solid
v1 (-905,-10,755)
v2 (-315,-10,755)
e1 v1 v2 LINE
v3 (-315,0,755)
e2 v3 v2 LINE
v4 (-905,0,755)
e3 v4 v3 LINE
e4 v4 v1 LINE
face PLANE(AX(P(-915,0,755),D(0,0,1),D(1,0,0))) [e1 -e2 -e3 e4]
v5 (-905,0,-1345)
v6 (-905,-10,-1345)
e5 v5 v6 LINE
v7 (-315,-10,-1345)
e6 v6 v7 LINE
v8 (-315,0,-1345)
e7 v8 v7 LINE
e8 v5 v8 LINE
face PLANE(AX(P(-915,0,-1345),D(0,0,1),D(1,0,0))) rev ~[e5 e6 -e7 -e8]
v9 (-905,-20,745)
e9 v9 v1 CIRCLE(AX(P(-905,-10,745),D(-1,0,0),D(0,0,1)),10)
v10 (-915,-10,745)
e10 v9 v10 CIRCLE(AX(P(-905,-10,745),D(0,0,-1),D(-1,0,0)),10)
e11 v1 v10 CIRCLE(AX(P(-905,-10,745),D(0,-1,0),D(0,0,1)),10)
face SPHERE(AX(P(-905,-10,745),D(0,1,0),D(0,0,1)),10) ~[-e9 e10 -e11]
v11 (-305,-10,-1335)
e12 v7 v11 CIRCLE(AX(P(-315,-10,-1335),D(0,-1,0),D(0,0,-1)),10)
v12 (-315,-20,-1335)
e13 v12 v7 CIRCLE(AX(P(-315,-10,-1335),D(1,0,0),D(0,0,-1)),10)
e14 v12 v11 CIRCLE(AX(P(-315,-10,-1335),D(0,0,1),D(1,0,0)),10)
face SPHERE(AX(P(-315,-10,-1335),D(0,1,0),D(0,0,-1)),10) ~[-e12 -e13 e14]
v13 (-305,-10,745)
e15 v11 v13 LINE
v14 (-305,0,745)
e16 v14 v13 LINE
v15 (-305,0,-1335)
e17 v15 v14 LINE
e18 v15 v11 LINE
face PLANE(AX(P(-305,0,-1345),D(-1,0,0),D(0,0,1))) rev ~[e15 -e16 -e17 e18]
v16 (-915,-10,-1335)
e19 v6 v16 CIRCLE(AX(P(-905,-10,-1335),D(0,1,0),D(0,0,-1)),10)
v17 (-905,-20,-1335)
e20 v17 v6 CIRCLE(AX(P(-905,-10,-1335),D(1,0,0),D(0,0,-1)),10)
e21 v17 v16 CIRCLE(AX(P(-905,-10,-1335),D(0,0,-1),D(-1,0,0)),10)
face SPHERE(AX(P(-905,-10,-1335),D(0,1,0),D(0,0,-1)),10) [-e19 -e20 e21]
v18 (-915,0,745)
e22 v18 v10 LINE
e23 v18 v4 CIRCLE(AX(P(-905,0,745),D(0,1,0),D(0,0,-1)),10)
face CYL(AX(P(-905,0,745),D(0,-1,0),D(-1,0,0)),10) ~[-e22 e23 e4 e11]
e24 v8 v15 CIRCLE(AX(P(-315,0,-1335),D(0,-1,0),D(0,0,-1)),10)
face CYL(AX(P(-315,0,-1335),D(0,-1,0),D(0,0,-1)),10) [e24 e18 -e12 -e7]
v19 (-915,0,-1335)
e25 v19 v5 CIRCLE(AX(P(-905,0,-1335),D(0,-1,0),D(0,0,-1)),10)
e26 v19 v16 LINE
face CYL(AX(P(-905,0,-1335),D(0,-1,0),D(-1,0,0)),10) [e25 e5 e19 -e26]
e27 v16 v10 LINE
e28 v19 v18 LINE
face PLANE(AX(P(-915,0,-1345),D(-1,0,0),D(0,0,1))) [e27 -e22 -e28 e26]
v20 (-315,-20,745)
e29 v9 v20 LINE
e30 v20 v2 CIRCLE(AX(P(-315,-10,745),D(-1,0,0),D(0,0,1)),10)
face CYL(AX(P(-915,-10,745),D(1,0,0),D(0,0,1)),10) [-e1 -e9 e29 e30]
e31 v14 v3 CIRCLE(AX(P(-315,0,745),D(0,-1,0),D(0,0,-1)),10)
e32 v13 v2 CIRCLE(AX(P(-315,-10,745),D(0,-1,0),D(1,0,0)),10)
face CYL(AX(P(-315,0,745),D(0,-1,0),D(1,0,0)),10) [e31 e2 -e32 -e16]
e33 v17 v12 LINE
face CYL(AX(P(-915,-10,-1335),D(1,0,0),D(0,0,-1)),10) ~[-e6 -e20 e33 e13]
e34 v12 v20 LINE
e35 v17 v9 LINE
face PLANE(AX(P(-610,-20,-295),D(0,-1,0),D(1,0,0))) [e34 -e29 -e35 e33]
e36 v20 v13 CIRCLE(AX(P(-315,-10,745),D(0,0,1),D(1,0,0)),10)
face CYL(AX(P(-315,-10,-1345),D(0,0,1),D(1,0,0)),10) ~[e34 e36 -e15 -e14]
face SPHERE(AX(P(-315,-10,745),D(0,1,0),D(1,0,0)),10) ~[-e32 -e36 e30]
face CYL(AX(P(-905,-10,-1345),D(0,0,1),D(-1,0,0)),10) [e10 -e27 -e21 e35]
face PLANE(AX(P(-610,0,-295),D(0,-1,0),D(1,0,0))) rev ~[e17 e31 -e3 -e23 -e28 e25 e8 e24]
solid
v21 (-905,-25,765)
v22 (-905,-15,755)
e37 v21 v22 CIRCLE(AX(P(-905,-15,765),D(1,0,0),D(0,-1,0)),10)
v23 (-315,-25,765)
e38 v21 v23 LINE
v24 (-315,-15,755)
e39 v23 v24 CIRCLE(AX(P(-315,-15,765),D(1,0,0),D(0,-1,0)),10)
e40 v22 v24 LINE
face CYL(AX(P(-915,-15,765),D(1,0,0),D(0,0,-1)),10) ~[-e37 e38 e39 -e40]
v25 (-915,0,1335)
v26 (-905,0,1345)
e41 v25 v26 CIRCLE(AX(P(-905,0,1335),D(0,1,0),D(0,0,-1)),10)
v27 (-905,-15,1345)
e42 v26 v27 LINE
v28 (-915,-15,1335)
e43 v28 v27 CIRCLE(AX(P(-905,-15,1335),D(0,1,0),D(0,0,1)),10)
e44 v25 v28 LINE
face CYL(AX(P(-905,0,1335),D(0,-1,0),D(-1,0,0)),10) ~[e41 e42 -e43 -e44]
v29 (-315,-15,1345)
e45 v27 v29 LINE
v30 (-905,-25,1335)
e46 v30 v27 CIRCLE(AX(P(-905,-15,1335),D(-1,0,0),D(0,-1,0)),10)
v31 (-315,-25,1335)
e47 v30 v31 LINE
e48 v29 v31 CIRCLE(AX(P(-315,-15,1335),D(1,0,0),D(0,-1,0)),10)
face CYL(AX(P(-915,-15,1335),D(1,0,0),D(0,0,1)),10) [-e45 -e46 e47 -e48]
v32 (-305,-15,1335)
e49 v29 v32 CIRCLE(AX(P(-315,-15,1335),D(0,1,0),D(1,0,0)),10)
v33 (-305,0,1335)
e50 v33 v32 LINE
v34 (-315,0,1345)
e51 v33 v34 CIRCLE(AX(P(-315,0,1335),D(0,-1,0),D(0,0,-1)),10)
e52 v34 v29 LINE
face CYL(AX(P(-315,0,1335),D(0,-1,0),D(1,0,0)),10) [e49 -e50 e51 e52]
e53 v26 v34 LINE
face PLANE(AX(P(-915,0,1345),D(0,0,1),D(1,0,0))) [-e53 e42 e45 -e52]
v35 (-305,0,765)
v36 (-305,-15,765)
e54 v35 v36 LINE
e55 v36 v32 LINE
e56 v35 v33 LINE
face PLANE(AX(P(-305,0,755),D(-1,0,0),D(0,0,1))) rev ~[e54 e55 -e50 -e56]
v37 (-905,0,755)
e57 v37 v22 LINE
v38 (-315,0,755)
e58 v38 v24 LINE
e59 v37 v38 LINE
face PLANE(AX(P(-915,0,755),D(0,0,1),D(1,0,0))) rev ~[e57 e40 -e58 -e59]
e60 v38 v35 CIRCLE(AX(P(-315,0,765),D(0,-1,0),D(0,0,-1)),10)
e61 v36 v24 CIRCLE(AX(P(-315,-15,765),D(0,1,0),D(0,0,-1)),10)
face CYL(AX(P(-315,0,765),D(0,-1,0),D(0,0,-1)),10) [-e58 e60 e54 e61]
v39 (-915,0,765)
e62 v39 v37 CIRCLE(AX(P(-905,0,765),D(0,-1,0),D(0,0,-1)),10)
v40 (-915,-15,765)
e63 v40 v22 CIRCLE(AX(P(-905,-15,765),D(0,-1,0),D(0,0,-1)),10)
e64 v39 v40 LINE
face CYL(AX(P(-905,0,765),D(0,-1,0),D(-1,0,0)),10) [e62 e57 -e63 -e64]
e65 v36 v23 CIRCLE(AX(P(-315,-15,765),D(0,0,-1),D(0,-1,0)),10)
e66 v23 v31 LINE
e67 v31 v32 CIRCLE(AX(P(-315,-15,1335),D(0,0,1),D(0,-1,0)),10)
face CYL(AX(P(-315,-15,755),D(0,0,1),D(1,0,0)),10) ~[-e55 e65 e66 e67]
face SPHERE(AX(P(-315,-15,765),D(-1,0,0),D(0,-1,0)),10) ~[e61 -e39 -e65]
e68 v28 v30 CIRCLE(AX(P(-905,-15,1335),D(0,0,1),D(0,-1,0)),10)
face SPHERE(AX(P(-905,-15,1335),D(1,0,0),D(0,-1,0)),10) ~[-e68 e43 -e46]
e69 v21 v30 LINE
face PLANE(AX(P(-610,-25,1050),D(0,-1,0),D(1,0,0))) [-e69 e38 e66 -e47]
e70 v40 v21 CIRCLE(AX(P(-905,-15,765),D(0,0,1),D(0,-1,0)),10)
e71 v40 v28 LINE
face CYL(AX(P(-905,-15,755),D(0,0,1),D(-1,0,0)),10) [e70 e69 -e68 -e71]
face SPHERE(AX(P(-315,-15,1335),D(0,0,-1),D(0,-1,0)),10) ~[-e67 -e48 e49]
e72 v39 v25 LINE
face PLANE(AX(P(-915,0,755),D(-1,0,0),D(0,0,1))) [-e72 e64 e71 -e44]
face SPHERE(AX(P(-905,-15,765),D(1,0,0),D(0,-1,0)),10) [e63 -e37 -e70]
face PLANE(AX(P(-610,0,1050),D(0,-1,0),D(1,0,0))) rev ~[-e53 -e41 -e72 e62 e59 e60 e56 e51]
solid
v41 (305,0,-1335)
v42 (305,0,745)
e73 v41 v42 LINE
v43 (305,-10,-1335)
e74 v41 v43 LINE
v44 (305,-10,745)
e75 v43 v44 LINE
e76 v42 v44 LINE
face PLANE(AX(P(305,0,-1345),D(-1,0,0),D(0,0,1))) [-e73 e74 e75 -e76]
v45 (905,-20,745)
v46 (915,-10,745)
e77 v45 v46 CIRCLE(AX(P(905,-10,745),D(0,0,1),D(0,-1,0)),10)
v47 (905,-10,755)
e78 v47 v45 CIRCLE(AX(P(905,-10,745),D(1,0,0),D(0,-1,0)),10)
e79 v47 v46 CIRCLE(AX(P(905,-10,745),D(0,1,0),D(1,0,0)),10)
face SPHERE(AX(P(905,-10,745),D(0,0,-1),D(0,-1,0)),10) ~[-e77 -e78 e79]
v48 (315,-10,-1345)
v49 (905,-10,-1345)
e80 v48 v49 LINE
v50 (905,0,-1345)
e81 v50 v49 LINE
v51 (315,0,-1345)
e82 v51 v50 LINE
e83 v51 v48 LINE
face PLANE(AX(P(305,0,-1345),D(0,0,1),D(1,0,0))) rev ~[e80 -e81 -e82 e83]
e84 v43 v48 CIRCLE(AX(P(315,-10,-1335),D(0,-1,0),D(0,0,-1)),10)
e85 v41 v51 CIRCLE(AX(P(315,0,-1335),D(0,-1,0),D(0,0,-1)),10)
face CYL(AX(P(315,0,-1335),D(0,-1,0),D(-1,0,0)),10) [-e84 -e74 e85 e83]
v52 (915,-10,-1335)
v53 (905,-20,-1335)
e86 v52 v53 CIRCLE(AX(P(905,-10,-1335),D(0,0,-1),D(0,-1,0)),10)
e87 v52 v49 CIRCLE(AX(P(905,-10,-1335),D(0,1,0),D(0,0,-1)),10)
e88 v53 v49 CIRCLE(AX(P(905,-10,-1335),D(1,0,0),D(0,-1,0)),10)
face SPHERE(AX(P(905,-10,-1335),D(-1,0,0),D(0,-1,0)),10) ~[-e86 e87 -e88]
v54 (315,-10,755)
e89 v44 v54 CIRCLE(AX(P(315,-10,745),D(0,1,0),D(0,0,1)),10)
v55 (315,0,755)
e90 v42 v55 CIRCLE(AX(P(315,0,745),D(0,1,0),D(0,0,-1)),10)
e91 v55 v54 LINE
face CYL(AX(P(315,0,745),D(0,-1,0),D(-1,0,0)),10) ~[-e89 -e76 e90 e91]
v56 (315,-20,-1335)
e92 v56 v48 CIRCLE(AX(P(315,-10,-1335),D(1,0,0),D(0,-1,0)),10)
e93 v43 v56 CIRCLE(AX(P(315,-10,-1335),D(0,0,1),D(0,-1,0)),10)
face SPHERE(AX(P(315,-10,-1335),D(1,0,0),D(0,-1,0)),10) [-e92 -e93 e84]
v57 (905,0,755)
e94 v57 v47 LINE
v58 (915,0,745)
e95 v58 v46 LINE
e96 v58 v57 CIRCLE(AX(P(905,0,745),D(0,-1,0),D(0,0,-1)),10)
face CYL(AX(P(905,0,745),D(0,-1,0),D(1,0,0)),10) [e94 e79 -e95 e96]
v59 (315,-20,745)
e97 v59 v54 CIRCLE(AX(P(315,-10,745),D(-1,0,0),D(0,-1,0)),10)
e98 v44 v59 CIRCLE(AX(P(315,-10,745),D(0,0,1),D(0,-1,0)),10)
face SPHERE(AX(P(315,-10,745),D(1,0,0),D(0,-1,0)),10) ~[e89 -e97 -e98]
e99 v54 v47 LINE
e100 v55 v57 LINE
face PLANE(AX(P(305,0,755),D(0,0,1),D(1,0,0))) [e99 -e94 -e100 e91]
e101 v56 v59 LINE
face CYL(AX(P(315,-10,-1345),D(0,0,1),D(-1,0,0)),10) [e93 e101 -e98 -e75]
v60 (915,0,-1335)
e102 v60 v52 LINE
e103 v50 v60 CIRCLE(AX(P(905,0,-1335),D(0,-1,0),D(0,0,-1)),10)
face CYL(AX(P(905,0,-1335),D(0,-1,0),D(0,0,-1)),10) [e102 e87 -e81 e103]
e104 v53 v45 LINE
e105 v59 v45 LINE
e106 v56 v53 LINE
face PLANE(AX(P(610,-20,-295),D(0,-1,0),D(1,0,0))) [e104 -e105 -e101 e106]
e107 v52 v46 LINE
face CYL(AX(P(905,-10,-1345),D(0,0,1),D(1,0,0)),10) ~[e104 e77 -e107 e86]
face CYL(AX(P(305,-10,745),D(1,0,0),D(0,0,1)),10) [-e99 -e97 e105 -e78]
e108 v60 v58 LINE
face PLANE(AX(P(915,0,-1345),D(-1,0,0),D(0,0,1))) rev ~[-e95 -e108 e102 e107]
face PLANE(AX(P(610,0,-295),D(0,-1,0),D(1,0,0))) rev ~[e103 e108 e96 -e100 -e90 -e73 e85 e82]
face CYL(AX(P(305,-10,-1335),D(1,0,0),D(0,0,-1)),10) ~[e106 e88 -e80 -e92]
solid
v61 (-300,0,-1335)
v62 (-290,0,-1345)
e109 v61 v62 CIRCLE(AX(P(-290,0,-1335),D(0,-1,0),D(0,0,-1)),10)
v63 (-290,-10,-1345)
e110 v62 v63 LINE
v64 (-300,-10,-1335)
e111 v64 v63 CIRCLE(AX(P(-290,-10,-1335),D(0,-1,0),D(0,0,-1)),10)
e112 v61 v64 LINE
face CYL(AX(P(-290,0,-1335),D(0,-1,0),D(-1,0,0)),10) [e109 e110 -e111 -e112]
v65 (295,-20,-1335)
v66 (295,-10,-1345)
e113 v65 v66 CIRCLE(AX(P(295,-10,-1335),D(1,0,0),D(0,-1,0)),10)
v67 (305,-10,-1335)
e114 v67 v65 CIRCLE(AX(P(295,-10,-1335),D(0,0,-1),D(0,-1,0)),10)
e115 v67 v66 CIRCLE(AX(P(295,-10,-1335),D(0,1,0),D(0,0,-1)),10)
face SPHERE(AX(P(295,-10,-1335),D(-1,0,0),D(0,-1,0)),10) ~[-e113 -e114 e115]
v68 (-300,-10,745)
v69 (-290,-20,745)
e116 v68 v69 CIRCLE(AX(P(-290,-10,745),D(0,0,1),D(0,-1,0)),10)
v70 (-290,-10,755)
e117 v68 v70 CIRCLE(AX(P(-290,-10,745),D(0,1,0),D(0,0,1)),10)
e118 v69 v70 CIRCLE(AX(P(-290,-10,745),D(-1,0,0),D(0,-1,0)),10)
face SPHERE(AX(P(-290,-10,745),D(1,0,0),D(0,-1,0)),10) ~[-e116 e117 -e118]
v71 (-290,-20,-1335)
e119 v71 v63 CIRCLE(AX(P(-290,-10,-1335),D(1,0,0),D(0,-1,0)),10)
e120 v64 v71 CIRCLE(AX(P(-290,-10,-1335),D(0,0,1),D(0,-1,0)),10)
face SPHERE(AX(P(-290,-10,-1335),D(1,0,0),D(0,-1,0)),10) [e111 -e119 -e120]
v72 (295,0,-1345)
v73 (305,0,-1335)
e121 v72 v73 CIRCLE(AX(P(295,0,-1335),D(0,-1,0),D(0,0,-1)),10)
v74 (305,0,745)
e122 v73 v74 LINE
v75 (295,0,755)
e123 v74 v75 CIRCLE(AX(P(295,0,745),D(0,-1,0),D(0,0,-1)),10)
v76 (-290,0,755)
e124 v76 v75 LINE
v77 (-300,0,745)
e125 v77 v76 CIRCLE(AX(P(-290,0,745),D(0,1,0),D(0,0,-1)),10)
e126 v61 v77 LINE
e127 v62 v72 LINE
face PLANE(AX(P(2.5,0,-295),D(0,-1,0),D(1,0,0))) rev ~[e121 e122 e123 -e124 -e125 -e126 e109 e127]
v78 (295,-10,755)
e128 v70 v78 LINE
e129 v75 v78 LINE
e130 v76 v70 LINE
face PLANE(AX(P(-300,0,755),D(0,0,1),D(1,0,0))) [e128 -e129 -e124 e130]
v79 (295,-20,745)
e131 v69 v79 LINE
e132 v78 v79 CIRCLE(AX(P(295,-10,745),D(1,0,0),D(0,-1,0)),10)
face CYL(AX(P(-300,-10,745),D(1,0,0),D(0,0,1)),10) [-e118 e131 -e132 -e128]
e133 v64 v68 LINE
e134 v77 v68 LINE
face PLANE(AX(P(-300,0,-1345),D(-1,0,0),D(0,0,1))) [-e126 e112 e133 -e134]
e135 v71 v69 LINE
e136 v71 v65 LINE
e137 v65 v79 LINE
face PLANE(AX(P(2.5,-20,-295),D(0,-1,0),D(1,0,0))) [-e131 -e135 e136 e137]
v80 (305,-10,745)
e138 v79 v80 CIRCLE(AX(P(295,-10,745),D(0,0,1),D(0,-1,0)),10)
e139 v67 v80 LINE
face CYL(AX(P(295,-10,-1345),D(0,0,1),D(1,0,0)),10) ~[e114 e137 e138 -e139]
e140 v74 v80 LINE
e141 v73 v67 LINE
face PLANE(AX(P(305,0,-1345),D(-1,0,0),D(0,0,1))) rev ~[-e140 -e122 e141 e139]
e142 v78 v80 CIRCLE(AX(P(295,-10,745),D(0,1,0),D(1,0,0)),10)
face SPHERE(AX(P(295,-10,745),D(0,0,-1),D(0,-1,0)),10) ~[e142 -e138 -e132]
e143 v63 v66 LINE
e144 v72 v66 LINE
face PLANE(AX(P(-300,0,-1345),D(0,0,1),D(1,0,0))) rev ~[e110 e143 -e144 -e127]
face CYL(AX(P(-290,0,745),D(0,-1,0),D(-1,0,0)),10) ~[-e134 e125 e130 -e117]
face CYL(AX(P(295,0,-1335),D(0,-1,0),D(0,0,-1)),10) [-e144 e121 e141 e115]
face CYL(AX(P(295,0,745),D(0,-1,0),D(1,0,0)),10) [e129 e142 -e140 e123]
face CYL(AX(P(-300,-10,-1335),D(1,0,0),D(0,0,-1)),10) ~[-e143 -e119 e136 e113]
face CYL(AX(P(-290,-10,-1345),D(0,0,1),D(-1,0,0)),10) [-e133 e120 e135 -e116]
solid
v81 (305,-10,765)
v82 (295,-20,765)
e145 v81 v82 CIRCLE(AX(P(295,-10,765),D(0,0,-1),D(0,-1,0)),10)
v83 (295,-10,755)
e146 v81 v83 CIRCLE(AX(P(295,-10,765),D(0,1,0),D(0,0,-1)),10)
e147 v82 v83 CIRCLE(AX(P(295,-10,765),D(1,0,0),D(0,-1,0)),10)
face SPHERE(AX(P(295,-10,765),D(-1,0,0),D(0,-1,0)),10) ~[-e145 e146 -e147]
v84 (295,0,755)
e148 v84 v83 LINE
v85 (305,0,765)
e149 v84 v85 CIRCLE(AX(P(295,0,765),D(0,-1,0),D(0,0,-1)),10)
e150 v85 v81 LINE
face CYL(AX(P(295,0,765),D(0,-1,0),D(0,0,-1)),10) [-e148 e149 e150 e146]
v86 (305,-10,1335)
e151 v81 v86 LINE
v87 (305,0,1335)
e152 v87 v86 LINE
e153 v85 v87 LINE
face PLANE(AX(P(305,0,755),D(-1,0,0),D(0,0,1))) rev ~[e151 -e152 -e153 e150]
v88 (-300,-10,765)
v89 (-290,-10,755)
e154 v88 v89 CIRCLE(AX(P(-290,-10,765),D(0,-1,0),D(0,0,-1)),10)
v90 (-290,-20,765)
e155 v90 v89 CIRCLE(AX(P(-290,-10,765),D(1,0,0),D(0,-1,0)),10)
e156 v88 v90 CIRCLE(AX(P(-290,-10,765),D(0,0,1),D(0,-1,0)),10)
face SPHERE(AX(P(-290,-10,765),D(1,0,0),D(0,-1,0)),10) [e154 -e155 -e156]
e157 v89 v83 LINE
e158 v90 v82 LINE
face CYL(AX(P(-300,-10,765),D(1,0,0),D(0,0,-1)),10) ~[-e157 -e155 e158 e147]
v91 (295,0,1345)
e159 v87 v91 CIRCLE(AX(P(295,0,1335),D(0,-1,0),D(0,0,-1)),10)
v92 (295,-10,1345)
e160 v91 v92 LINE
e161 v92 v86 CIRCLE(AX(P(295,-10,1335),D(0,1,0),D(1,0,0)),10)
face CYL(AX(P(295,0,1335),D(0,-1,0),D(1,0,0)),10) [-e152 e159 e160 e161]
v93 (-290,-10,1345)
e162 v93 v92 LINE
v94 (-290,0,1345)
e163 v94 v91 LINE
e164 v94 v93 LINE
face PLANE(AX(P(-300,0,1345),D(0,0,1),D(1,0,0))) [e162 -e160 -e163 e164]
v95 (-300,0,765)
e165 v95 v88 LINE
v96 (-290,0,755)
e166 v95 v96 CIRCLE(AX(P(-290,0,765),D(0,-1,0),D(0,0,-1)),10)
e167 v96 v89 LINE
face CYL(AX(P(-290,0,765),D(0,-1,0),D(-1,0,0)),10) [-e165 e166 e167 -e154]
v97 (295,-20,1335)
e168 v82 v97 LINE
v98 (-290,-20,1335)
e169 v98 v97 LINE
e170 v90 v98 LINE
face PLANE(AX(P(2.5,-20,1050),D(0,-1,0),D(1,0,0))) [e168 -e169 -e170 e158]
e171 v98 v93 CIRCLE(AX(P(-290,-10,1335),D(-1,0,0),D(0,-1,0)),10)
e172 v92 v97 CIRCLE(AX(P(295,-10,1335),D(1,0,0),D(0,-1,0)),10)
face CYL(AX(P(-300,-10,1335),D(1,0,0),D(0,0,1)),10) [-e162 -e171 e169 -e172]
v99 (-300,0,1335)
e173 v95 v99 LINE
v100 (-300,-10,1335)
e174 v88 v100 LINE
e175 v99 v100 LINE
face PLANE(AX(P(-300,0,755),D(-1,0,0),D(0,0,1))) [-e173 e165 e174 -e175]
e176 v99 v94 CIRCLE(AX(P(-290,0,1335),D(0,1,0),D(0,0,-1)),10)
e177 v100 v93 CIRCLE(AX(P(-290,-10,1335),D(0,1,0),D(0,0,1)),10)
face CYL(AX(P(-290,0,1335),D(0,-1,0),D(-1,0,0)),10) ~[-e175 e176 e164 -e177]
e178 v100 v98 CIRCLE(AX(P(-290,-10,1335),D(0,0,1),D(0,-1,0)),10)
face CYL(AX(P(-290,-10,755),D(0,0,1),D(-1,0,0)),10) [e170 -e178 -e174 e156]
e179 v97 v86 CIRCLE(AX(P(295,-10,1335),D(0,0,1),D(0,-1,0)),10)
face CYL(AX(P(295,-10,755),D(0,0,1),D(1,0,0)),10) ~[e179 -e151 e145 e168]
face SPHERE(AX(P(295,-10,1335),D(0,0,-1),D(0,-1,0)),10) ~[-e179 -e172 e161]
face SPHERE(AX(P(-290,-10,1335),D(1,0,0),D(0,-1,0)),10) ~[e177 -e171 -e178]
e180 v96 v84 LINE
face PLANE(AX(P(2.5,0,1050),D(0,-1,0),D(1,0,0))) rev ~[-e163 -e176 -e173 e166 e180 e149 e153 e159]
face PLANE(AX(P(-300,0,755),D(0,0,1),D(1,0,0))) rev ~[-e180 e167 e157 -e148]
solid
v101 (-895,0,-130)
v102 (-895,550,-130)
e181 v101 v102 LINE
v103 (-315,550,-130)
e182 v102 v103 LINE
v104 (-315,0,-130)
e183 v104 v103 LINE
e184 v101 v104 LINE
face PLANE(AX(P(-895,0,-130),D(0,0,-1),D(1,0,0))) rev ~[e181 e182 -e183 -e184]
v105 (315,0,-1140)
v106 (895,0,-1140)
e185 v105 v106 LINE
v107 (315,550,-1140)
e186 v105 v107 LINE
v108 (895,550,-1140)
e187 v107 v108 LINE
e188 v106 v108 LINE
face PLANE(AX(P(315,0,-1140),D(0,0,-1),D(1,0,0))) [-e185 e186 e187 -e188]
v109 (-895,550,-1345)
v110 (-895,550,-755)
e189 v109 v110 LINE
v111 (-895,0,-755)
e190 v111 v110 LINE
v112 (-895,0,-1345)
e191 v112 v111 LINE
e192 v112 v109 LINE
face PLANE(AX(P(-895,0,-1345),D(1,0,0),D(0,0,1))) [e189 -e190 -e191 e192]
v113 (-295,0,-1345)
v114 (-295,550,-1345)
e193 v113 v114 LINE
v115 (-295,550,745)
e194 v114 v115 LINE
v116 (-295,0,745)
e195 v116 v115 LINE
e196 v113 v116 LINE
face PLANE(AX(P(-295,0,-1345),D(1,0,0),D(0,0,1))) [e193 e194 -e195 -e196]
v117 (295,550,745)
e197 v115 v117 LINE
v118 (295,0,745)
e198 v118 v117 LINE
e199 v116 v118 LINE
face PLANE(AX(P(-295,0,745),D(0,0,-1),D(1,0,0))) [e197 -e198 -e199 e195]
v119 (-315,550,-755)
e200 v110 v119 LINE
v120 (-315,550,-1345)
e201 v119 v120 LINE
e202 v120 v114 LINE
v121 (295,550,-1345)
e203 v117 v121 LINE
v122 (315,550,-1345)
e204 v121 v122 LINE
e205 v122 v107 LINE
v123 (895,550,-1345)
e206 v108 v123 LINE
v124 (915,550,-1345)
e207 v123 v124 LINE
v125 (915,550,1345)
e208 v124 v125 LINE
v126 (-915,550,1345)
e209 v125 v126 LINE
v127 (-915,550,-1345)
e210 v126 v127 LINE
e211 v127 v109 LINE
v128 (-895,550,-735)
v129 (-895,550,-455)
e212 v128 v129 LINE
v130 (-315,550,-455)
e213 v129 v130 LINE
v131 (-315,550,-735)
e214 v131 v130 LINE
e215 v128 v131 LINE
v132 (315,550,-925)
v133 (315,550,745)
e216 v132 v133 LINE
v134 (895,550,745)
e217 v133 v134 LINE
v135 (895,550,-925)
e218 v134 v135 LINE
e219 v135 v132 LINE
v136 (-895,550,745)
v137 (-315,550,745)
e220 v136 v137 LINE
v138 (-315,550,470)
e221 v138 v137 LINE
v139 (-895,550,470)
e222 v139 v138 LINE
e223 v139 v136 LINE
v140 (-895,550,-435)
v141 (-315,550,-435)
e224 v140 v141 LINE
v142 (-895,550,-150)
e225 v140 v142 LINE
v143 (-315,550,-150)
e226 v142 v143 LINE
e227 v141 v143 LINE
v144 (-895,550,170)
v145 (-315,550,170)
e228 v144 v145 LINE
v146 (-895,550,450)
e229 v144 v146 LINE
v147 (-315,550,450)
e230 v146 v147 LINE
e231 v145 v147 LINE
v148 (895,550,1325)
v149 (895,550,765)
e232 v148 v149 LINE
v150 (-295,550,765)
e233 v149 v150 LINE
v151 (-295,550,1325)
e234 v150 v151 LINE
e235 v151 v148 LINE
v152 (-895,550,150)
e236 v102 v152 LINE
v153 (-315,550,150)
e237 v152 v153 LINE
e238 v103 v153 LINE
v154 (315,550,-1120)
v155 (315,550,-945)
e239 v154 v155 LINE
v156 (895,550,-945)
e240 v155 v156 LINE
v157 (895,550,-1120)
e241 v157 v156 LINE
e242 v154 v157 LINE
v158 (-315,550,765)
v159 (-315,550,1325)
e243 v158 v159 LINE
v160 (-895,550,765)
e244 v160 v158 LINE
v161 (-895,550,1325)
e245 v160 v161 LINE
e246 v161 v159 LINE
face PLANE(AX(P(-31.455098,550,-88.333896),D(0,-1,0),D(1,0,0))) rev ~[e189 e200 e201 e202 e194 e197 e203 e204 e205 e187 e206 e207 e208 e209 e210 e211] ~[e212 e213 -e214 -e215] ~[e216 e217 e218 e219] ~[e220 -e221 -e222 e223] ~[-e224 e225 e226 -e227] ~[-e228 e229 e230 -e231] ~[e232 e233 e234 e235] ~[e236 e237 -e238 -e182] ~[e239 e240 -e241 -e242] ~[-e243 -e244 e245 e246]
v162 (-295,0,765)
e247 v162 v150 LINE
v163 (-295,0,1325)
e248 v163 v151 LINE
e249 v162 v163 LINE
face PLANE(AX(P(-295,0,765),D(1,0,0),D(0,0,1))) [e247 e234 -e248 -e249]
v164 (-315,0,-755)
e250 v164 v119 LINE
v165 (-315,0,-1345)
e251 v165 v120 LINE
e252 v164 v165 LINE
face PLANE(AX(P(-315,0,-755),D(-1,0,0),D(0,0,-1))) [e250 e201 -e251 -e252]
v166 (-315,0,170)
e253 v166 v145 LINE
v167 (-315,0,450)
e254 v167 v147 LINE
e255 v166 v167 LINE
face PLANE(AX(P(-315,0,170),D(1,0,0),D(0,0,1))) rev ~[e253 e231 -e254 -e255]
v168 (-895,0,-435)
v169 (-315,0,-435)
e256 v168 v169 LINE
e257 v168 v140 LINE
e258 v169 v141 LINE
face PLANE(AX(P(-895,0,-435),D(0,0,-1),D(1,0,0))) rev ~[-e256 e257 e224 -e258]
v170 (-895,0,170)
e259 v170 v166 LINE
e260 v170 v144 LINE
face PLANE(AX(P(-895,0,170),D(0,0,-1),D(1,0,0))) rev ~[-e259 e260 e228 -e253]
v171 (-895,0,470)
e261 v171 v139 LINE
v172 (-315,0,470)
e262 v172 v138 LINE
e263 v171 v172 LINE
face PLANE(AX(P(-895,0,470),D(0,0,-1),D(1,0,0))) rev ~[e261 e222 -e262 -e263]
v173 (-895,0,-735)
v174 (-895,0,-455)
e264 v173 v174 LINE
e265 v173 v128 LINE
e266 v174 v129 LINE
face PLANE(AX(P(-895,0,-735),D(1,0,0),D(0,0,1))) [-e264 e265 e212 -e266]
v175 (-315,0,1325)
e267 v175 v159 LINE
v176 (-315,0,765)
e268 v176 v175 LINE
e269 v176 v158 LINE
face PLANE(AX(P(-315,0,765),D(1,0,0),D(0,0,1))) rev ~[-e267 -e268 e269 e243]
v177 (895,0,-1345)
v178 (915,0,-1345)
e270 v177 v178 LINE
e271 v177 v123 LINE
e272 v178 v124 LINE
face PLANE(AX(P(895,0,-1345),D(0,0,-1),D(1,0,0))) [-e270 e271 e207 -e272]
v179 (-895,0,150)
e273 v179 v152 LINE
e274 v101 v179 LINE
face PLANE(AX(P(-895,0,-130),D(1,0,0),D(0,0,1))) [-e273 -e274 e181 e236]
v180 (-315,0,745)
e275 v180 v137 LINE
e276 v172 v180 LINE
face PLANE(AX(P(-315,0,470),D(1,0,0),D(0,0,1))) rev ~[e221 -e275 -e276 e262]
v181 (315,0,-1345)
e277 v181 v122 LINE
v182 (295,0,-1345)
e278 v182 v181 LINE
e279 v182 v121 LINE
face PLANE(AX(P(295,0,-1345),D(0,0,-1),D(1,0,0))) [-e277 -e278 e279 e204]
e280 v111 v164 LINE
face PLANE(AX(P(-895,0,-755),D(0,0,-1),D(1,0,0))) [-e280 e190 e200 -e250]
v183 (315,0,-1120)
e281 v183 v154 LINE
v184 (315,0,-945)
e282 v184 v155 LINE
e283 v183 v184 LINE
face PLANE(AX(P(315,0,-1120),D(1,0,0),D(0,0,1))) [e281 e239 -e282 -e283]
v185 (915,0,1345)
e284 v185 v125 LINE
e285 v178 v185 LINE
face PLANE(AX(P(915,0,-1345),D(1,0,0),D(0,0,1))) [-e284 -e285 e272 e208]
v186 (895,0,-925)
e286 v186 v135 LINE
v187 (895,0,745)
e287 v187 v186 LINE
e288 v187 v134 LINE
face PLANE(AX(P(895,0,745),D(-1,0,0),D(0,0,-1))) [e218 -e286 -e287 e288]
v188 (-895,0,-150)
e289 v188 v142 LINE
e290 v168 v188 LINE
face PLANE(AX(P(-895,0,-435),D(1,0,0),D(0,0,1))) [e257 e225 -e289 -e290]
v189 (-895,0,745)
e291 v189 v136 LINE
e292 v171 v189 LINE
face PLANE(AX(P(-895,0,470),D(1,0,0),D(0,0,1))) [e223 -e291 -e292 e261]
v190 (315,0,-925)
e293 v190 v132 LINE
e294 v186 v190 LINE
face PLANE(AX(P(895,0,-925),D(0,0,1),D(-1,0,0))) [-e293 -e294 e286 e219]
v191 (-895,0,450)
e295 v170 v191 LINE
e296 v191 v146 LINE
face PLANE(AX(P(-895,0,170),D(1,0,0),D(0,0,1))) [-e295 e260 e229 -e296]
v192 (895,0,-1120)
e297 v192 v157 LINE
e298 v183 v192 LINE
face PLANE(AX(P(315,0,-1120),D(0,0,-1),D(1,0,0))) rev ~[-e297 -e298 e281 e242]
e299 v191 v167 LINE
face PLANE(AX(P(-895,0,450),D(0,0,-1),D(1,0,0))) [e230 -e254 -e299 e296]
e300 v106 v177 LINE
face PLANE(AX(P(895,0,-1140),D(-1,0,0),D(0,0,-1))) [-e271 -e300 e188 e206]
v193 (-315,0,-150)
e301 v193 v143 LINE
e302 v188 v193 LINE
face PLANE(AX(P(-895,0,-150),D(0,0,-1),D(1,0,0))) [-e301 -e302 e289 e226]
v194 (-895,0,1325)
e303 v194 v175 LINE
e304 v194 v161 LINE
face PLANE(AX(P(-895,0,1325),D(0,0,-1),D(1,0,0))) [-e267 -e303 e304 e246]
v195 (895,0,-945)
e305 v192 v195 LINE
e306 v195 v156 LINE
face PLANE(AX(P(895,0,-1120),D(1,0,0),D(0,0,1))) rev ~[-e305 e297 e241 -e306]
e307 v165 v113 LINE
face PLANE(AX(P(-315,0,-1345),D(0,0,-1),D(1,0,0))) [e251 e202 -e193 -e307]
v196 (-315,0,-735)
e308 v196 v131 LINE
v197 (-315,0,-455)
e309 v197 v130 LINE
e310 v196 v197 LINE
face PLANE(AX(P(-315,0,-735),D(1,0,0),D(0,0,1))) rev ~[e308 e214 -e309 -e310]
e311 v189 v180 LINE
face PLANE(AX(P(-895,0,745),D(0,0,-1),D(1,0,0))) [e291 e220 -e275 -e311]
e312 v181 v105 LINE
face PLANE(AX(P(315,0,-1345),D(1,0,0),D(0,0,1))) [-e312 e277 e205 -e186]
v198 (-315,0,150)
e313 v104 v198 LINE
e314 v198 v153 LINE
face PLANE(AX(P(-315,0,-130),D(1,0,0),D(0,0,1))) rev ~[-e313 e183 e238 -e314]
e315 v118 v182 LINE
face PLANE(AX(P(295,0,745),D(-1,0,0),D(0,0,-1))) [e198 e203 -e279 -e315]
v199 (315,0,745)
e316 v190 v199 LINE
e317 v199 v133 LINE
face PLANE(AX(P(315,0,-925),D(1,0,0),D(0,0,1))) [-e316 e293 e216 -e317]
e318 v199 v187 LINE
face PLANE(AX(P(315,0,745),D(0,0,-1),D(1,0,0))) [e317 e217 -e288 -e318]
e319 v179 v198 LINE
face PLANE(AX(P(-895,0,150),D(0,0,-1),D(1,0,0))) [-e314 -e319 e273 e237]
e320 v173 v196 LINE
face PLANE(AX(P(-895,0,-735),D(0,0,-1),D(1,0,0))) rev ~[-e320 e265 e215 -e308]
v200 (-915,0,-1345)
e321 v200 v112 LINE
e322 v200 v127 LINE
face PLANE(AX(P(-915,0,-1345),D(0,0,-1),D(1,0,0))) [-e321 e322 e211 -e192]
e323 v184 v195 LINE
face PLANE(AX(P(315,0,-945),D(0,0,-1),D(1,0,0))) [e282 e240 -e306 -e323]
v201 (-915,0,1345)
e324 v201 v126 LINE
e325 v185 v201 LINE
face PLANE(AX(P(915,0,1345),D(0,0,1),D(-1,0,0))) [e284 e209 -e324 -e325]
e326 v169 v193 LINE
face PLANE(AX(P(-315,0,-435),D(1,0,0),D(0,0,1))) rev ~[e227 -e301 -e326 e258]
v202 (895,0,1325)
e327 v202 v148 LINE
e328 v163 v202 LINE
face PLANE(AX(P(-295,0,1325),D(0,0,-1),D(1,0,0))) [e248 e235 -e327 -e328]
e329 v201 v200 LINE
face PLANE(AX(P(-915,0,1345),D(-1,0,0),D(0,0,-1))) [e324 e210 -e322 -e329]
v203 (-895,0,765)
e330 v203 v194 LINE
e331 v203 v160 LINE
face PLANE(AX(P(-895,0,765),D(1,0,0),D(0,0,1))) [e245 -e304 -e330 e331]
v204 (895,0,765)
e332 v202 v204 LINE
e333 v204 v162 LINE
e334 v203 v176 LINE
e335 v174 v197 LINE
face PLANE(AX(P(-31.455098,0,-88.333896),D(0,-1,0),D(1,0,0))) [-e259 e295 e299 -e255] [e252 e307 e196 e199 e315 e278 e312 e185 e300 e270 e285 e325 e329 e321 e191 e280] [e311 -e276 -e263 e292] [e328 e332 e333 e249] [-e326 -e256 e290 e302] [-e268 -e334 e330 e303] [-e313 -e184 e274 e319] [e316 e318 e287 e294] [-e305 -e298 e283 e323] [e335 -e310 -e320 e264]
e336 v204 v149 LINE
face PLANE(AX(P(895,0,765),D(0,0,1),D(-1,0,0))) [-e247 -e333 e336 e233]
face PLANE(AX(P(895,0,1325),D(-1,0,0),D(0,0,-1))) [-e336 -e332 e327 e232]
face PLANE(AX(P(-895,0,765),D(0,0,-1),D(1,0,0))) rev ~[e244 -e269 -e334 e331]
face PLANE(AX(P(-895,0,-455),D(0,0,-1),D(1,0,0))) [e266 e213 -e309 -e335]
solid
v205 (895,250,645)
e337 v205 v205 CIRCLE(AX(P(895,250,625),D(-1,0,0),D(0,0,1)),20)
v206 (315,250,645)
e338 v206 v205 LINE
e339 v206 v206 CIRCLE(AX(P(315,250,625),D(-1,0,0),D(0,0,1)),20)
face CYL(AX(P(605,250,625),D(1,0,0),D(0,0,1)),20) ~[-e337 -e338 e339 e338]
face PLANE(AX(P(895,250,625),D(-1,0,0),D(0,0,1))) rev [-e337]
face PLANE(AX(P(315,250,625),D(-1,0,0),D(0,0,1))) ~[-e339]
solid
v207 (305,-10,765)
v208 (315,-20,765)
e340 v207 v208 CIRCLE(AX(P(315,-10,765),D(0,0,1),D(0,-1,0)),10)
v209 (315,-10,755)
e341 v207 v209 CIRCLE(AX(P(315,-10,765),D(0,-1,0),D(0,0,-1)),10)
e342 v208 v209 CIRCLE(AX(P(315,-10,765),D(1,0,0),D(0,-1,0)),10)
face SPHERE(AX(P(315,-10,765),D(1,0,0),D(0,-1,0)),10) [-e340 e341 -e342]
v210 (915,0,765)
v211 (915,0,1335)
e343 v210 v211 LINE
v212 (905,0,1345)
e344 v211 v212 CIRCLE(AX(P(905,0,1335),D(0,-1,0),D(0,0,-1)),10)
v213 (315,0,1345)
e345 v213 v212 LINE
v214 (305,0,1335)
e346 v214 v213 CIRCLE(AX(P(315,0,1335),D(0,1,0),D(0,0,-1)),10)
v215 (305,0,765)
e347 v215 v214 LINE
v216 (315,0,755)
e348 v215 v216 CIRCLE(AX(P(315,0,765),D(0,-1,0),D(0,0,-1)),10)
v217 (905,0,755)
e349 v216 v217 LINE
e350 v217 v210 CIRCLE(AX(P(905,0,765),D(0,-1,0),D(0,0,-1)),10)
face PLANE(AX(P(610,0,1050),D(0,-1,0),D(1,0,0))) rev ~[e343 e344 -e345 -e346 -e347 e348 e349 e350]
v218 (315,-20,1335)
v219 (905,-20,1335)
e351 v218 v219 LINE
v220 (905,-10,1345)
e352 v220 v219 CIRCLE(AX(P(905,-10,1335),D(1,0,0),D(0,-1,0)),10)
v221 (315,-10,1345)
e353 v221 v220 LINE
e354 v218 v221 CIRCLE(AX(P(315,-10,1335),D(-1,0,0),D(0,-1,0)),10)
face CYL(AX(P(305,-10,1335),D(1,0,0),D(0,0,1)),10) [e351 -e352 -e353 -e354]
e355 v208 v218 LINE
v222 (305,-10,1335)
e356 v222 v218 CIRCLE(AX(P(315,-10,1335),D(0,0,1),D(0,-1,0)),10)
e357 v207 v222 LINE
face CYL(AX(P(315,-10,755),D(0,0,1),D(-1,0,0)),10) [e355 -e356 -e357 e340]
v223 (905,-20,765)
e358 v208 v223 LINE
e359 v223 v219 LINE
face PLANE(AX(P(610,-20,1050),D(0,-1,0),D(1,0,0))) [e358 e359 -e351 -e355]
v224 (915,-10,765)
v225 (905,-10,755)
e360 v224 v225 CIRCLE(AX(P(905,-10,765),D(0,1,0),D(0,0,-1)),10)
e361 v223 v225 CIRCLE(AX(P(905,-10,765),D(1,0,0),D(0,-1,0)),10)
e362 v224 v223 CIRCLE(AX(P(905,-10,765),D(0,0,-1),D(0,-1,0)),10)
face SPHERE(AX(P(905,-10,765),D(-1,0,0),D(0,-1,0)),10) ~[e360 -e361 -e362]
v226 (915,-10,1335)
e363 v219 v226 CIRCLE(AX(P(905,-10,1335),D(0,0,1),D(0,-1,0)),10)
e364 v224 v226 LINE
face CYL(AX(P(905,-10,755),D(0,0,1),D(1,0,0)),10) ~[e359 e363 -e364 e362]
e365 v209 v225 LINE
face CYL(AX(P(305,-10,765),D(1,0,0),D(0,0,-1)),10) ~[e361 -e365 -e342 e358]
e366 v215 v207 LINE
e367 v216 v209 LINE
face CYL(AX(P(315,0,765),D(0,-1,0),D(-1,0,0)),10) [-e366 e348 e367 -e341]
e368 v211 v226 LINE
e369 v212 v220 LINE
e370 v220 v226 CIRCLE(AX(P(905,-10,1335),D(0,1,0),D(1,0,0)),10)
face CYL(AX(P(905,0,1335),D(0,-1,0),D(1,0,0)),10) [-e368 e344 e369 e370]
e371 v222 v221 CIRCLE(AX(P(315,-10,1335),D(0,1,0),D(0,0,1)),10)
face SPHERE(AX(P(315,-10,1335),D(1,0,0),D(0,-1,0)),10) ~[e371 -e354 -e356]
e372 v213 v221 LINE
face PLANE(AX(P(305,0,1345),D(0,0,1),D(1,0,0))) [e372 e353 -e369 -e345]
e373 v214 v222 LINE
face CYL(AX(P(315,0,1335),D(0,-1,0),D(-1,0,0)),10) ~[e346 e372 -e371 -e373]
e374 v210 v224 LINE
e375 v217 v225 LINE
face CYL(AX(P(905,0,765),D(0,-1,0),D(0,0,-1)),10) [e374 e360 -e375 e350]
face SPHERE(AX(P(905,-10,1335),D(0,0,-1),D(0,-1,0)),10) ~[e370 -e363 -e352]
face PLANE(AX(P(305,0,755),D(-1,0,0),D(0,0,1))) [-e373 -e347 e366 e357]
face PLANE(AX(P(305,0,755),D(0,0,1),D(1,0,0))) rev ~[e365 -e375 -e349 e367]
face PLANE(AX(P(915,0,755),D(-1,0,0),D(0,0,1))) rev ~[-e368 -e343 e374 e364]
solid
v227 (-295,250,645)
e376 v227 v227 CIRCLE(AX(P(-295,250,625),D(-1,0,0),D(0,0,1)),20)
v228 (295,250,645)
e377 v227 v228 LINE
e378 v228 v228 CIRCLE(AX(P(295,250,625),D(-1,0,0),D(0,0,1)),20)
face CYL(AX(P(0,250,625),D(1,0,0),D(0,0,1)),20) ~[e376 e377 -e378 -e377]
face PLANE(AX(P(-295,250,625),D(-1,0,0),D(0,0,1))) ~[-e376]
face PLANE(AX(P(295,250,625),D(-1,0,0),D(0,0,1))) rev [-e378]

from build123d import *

# Parameters (mm, degrees)
F0_W      = 580
F0_H      = 280
F0_H_2    = 285
F0_H_3    = 175
F0_H_4    = 275
F0_H_5    = 560
F1_DEPTH  = 550
F0_W_2    = 590
F0_H_6    = 20
F5_W      = 610
F5_H      = 2100
F6_DEPTH  = 20
F7_R      = 10
F5_W_2    = 605
F8_DEPTH  = 20
F9_R      = 10
F10_DEPTH = 20
F11_R     = 10
F5_H_2    = 590
F12_DEPTH = 20
F13_R     = 10
F14_DEPTH = 20
F15_R     = 10
F16_DEPTH = 25
F17_R     = 10


# Not quite as in the source:
# - a feature names something its author has since deleted; it is built from what else it names
# - the program builds the solid bodies; features that only make, move or delete a surface that nothing else refers to are left out


with BuildPart() as f1:
    # F0 (on Front) → F1 (new body)
    with BuildSketch(Plane.XZ):
        Polygon((895, -1345), (915, -1345), (915, 1345), (-915, 1345), (-915, -1345), (-895, -1345), (-895, -755), (-315, -755), (-315, -1345), (-295, -1345), (-295, -395), (-295, -375), (-295, 625), (-295, 645), (-295, 745), (295, 745), (295, 645), (295, 625), (295, -375), (295, -395), (295, -1345), (315, -1345), (315, -1320), (315, -1140), (895, -1140), (895, -1320), align=None)
        with Locations((-605, -595)):
            Rectangle(F0_W, F0_H, mode=Mode.SUBTRACT)
        with Locations((-605, -292.5)):
            Rectangle(F0_W, F0_H_2, mode=Mode.SUBTRACT)
        with Locations((605, -1032.5)):
            Rectangle(F0_W, F0_H_3, mode=Mode.SUBTRACT)
        Polygon((315, 745), (895, 745), (895, 645), (895, 625), (895, -925), (315, -925), (315, 625), (315, 645), align=None, mode=Mode.SUBTRACT)
        with Locations((-605, 10)):
            Rectangle(F0_W, F0_H, mode=Mode.SUBTRACT)
        with Locations((-605, 310)):
            Rectangle(F0_W, F0_H, mode=Mode.SUBTRACT)
        with Locations((-605, 607.5)):
            Rectangle(F0_W, F0_H_4, mode=Mode.SUBTRACT)
        with Locations((-605, 1045)):
            Rectangle(F0_W, F0_H_5, mode=Mode.SUBTRACT)
        Polygon((-295, 1325), (895, 1325), (895, 765), (315, 765), (295, 765), (-295, 765), align=None, mode=Mode.SUBTRACT)
    extrude(amount=-F1_DEPTH)


with BuildPart() as f2:
    # F0 (on Front) → F2 (revolve)
    with BuildSketch(Plane.XZ):
        with Locations((0, 635)):
            Rectangle(F0_W_2, F0_H_6)
    revolve(axis=Axis((0, 0, 625), (-1, 0, 0)))


with BuildPart() as f2b:
    # F0 (on Front) → F2, piece 2 (revolve)
    with BuildSketch(Plane.XZ):
        with Locations((605, 635)):
            Rectangle(F0_W, F0_H_6)
    revolve(axis=Axis((0, 0, 625), (-1, 0, 0)))


with BuildPart() as f2_1:
    # F4: moved
    add(f2.part.moved(Location((0, 250, 0))))


with BuildPart() as f2b_1:
    # F4: moved
    add(f2b.part.moved(Location((0, 250, 0))))


with BuildPart() as f6:
    # F5 (on Front) → F6 (new body)
    with BuildSketch(Plane.XZ):
        with Locations((-610, -295)):
            Rectangle(F5_W, F5_H)
    extrude(amount=F6_DEPTH)

    # F7
    f7_edges = [f6.edges().sort_by_distance(p)[0] for p in [
        (-305, -10, 755),
        (-915, -10, 755),
        (-915, -10, -1345),
        (-305, -10, -1345),
        (-610, -20, -1345),
        (-305, -20, -295),
        (-610, -20, 755),
        (-915, -20, -295),
    ]]
    fillet(f7_edges, radius=F7_R)


with BuildPart() as f8:
    # F5 (on Front) → F8 (new body)
    with BuildSketch(Plane.XZ):
        with Locations((2.5, -295)):
            Rectangle(F5_W_2, F5_H)
    extrude(amount=F8_DEPTH)

    # F9
    f9_edges = [f8.edges().sort_by_distance(p)[0] for p in [
        (2.5, -20, -1345),
        (305, -20, -295),
        (2.5, -20, 755),
        (-300, -20, -295),
        (305, -10, 755),
        (-300, -10, 755),
        (305, -10, -1345),
        (-300, -10, -1345),
    ]]
    fillet(f9_edges, radius=F9_R)


with BuildPart() as f10:
    # F5 (on Front) → F10 (new body)
    with BuildSketch(Plane.XZ):
        with Locations((610, -295)):
            Rectangle(F5_W, F5_H)
    extrude(amount=F10_DEPTH)

    # F11
    f11_edges = [f10.edges().sort_by_distance(p)[0] for p in [
        (610, -20, -1345),
        (915, -20, -295),
        (610, -20, 755),
        (305, -20, -295),
        (915, -10, 755),
        (305, -10, 755),
        (305, -10, -1345),
        (915, -10, -1345),
    ]]
    fillet(f11_edges, radius=F11_R)


with BuildPart() as f12:
    # F5 (on Front) → F12 (new body)
    with BuildSketch(Plane.XZ):
        with Locations((610, 1050)):
            Rectangle(F5_W, F5_H_2)
    extrude(amount=F12_DEPTH)

    # F13
    f13_edges = [f12.edges().sort_by_distance(p)[0] for p in [
        (610, -20, 755),
        (915, -20, 1050),
        (610, -20, 1345),
        (305, -20, 1050),
        (915, -10, 1345),
        (915, -10, 755),
        (305, -10, 1345),
        (305, -10, 755),
    ]]
    fillet(f13_edges, radius=F13_R)


with BuildPart() as f14:
    # F5 (on Front) → F14 (new body)
    with BuildSketch(Plane.XZ):
        with Locations((2.5, 1050)):
            Rectangle(F5_W_2, F5_H_2)
    extrude(amount=F14_DEPTH)

    # F15
    f15_edges = [f14.edges().sort_by_distance(p)[0] for p in [
        (2.5, -20, 755),
        (305, -20, 1050),
        (2.5, -20, 1345),
        (-300, -20, 1050),
        (-300, -10, 1345),
        (305, -10, 1345),
        (305, -10, 755),
        (-300, -10, 755),
    ]]
    fillet(f15_edges, radius=F15_R)


with BuildPart() as f16:
    # F5 (on Front) → F16 (new body)
    with BuildSketch(Plane.XZ):
        with Locations((-610, 1050)):
            Rectangle(F5_W, F5_H_2)
    extrude(amount=F16_DEPTH)

    # F17
    f17_edges = [f16.edges().sort_by_distance(p)[0] for p in [
        (-610, -25, 755),
        (-305, -25, 1050),
        (-610, -25, 1345),
        (-915, -25, 1050),
        (-915, -12.5, 1345),
        (-305, -12.5, 1345),
        (-915, -12.5, 755),
        (-305, -12.5, 755),
    ]]
    fillet(f17_edges, radius=F17_R)


solid = Compound([f1.part, f2_1.part, f2b_1.part, f6.part, f8.part, f10.part, f12.part, f14.part, f16.part])
